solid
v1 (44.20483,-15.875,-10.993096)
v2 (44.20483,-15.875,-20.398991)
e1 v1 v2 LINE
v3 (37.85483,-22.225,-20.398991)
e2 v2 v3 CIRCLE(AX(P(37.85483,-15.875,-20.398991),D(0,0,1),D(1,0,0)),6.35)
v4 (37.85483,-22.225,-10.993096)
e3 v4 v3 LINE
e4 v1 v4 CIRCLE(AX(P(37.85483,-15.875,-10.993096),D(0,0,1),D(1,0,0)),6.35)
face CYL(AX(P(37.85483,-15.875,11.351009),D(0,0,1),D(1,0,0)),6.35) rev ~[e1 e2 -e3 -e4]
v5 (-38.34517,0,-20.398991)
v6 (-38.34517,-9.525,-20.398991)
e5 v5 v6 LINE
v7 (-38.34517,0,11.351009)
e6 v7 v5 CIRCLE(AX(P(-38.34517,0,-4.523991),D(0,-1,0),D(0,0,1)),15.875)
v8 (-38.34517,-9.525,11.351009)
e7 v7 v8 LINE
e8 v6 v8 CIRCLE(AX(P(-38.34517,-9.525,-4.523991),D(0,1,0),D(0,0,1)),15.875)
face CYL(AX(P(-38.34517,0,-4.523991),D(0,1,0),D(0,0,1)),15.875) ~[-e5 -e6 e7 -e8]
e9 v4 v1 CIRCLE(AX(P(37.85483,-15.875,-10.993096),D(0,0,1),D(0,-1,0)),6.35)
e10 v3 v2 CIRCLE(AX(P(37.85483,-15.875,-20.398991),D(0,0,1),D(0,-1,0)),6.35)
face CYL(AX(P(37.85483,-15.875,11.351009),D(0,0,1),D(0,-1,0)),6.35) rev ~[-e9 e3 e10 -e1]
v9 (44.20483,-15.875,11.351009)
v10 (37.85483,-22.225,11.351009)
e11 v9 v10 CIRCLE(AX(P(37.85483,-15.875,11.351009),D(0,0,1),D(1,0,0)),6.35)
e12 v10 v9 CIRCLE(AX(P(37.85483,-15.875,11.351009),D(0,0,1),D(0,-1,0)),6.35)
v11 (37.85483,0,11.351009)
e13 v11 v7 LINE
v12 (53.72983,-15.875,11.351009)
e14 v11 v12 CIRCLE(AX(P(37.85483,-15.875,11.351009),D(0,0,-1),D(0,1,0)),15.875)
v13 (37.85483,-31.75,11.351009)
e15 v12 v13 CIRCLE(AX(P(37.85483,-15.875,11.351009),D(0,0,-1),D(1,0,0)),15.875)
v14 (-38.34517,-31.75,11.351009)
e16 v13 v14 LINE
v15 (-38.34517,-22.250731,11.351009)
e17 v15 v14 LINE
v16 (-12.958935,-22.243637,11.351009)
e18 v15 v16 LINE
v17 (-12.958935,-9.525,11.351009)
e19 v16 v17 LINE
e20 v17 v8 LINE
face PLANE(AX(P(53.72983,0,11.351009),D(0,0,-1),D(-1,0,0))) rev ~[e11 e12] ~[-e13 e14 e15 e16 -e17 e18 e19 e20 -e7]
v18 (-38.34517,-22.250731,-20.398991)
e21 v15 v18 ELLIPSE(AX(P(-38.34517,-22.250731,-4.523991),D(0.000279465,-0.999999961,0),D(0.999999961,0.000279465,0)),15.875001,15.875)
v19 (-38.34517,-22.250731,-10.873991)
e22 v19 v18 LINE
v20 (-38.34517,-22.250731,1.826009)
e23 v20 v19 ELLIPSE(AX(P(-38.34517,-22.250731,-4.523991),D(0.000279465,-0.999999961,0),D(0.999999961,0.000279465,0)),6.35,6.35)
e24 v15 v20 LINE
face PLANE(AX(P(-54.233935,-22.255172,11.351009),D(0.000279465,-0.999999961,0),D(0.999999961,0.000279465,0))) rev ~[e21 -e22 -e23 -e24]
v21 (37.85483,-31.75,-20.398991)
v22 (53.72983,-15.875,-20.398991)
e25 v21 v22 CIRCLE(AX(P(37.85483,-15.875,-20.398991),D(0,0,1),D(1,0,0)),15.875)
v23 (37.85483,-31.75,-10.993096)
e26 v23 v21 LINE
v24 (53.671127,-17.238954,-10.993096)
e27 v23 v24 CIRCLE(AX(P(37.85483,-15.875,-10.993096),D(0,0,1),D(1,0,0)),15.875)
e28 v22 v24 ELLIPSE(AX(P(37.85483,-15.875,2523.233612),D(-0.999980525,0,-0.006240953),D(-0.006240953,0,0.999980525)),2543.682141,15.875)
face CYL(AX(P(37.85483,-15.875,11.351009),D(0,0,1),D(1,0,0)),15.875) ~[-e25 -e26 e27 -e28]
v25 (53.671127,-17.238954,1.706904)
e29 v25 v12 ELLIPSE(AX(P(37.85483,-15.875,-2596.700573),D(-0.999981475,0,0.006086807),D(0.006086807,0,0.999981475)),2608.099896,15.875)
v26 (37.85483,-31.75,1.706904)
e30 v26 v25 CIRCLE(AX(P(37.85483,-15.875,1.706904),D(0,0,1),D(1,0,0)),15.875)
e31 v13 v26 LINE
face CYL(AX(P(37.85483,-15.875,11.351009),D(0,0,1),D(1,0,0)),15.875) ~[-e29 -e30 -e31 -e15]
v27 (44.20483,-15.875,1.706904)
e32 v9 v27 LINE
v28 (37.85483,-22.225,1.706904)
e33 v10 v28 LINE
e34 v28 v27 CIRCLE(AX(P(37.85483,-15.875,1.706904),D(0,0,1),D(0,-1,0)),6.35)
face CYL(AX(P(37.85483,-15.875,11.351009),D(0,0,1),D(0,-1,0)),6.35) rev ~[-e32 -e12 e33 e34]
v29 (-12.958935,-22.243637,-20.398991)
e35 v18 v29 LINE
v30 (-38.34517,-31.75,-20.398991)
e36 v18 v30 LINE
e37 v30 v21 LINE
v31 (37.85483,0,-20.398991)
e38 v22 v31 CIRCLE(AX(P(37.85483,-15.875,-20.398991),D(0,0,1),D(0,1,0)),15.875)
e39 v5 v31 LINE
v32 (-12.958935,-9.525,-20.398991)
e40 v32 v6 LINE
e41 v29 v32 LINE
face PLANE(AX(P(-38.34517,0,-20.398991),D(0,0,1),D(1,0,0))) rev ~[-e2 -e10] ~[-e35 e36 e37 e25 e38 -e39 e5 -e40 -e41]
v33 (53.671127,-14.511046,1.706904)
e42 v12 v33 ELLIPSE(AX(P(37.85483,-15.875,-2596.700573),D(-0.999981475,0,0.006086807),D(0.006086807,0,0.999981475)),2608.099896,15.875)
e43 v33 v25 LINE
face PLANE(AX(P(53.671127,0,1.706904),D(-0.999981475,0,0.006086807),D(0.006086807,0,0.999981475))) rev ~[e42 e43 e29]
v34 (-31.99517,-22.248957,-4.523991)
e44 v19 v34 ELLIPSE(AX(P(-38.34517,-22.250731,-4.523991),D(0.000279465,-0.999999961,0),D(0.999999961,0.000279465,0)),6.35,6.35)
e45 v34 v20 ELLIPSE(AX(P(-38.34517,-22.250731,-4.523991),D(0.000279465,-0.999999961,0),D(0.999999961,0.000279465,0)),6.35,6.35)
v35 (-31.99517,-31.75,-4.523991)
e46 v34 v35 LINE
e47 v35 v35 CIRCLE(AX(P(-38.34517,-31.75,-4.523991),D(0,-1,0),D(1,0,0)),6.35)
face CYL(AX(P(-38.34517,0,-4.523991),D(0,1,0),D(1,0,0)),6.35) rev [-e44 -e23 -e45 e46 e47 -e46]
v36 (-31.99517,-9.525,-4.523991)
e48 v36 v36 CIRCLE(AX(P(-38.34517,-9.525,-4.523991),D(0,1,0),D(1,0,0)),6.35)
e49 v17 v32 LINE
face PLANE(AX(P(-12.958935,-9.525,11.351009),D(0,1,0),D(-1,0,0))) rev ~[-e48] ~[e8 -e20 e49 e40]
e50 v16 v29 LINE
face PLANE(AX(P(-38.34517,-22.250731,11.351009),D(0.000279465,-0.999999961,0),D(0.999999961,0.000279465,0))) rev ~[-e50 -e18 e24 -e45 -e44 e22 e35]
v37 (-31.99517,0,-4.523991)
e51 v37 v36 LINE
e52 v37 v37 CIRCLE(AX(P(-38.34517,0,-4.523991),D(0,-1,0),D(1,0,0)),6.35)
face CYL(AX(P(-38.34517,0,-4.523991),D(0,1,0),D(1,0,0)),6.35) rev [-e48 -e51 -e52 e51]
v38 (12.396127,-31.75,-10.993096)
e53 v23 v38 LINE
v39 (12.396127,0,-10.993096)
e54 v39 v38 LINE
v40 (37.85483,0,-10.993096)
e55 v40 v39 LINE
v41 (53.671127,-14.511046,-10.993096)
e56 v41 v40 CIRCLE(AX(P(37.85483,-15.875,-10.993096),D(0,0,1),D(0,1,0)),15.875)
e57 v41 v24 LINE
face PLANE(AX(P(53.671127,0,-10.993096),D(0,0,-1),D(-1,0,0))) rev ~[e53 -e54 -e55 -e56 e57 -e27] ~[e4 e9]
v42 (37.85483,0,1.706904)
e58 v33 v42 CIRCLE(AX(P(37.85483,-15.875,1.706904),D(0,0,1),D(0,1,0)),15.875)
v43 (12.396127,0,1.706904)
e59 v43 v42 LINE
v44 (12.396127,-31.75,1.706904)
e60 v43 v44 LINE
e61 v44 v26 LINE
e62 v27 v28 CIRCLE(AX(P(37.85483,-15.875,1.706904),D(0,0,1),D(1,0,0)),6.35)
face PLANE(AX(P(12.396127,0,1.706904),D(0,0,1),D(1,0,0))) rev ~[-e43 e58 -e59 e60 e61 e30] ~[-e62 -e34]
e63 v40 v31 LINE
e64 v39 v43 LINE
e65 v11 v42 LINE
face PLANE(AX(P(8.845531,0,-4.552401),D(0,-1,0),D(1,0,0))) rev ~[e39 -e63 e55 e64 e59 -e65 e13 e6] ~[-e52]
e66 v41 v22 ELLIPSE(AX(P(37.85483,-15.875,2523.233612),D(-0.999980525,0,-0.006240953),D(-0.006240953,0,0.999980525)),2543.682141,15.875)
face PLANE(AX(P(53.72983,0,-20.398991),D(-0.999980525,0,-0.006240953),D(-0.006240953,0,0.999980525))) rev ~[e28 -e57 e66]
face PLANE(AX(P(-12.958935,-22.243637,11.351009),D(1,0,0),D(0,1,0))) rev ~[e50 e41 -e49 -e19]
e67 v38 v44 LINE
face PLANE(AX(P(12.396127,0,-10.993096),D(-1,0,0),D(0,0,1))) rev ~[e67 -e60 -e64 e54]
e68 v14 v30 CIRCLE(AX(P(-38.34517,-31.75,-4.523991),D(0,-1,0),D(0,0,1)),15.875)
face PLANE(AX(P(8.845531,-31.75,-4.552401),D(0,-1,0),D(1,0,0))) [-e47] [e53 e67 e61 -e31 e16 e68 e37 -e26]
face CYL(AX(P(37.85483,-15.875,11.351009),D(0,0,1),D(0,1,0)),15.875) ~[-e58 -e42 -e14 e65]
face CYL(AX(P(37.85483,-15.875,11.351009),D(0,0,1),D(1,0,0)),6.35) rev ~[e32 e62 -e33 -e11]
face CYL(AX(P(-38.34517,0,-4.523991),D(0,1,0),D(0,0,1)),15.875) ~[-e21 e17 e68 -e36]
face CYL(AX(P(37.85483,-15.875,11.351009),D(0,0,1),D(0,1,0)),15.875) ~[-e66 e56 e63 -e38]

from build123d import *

# Parameters (mm, degrees)
F0_R     = 6.35
F1_DEPTH = 31.75
F3_DEPTH = 31.751


with BuildPart() as f1:
    # F0 (on Front) → F1 (new body)
    with BuildSketch(Plane.XZ):
        with BuildLine():
            Line((53.7298298755, 11.3510093242), (-38.3451701245, 11.3510093242))
            ThreePointArc((-38.3451701245, 11.3510093242), (-54.2201701245, -4.5239906758), (-38.3451701245, -20.3989906758))
            Line((-38.3451701245, -20.3989906758), (53.7298298755, -20.3989906758))
            Line((53.7298298755, -20.3989906758), (53.6711269855, -10.9930955659))
            Line((53.6711269855, -10.9930955659), (12.3961269855, -10.9930955659))
            Line((12.3961269855, -10.9930955659), (12.3961269855, 1.7069044341))
            Line((12.3961269855, 1.7069044341), (53.6711269855, 1.7069044341))
            Line((53.6711269855, 1.7069044341), (53.7298298755, 11.3510093242))
        make_face()
        with Locations((-38.3451701245, -4.5239906758)):
            Circle(F0_R, mode=Mode.SUBTRACT)
    extrude(amount=F1_DEPTH)

    # F2 (on face) → F3 (cut, through all)
    with BuildSketch(Plane.XY.offset(11.3510093242)):
        with BuildLine():
            Line((53.7298298755, 0), (37.8548298755, 0))
            ThreePointArc((37.8548298755, 0), (49.0801500268, -4.6496798487), (53.7298298755, -15.875))
            Line((53.7298298755, -15.875), (53.7298298755, 0))
        make_face()
        with BuildLine():
            Line((53.7298298755, -31.75), (53.7298298755, -15.875))
            ThreePointArc((53.7298298755, -15.875), (49.0801500268, -27.1003201513), (37.8548298755, -31.75))
            Line((37.8548298755, -31.75), (53.7298298755, -31.75))
        make_face()
        Polygon((-38.3451701245, -22.2507314071), (-38.3451701245, -9.525), (-54.2339347303, -9.525), (-54.2339347303, -22.2551717675), align=None)
        Polygon((-12.9589347303, -9.525), (-38.3451701245, -9.525), (-38.3451701245, -22.2507314071), (-12.9589347303, -22.243636832), align=None)
        with BuildLine():
            ThreePointArc((37.8548298755, -22.225), (42.344957936, -20.3651280605), (44.2048298755, -15.875))
            ThreePointArc((44.2048298755, -15.875), (33.3647018149, -11.3848719395), (37.8548298755, -22.225))
        make_face()
    extrude(amount=-F3_DEPTH, mode=Mode.SUBTRACT)


solid = f1.part
